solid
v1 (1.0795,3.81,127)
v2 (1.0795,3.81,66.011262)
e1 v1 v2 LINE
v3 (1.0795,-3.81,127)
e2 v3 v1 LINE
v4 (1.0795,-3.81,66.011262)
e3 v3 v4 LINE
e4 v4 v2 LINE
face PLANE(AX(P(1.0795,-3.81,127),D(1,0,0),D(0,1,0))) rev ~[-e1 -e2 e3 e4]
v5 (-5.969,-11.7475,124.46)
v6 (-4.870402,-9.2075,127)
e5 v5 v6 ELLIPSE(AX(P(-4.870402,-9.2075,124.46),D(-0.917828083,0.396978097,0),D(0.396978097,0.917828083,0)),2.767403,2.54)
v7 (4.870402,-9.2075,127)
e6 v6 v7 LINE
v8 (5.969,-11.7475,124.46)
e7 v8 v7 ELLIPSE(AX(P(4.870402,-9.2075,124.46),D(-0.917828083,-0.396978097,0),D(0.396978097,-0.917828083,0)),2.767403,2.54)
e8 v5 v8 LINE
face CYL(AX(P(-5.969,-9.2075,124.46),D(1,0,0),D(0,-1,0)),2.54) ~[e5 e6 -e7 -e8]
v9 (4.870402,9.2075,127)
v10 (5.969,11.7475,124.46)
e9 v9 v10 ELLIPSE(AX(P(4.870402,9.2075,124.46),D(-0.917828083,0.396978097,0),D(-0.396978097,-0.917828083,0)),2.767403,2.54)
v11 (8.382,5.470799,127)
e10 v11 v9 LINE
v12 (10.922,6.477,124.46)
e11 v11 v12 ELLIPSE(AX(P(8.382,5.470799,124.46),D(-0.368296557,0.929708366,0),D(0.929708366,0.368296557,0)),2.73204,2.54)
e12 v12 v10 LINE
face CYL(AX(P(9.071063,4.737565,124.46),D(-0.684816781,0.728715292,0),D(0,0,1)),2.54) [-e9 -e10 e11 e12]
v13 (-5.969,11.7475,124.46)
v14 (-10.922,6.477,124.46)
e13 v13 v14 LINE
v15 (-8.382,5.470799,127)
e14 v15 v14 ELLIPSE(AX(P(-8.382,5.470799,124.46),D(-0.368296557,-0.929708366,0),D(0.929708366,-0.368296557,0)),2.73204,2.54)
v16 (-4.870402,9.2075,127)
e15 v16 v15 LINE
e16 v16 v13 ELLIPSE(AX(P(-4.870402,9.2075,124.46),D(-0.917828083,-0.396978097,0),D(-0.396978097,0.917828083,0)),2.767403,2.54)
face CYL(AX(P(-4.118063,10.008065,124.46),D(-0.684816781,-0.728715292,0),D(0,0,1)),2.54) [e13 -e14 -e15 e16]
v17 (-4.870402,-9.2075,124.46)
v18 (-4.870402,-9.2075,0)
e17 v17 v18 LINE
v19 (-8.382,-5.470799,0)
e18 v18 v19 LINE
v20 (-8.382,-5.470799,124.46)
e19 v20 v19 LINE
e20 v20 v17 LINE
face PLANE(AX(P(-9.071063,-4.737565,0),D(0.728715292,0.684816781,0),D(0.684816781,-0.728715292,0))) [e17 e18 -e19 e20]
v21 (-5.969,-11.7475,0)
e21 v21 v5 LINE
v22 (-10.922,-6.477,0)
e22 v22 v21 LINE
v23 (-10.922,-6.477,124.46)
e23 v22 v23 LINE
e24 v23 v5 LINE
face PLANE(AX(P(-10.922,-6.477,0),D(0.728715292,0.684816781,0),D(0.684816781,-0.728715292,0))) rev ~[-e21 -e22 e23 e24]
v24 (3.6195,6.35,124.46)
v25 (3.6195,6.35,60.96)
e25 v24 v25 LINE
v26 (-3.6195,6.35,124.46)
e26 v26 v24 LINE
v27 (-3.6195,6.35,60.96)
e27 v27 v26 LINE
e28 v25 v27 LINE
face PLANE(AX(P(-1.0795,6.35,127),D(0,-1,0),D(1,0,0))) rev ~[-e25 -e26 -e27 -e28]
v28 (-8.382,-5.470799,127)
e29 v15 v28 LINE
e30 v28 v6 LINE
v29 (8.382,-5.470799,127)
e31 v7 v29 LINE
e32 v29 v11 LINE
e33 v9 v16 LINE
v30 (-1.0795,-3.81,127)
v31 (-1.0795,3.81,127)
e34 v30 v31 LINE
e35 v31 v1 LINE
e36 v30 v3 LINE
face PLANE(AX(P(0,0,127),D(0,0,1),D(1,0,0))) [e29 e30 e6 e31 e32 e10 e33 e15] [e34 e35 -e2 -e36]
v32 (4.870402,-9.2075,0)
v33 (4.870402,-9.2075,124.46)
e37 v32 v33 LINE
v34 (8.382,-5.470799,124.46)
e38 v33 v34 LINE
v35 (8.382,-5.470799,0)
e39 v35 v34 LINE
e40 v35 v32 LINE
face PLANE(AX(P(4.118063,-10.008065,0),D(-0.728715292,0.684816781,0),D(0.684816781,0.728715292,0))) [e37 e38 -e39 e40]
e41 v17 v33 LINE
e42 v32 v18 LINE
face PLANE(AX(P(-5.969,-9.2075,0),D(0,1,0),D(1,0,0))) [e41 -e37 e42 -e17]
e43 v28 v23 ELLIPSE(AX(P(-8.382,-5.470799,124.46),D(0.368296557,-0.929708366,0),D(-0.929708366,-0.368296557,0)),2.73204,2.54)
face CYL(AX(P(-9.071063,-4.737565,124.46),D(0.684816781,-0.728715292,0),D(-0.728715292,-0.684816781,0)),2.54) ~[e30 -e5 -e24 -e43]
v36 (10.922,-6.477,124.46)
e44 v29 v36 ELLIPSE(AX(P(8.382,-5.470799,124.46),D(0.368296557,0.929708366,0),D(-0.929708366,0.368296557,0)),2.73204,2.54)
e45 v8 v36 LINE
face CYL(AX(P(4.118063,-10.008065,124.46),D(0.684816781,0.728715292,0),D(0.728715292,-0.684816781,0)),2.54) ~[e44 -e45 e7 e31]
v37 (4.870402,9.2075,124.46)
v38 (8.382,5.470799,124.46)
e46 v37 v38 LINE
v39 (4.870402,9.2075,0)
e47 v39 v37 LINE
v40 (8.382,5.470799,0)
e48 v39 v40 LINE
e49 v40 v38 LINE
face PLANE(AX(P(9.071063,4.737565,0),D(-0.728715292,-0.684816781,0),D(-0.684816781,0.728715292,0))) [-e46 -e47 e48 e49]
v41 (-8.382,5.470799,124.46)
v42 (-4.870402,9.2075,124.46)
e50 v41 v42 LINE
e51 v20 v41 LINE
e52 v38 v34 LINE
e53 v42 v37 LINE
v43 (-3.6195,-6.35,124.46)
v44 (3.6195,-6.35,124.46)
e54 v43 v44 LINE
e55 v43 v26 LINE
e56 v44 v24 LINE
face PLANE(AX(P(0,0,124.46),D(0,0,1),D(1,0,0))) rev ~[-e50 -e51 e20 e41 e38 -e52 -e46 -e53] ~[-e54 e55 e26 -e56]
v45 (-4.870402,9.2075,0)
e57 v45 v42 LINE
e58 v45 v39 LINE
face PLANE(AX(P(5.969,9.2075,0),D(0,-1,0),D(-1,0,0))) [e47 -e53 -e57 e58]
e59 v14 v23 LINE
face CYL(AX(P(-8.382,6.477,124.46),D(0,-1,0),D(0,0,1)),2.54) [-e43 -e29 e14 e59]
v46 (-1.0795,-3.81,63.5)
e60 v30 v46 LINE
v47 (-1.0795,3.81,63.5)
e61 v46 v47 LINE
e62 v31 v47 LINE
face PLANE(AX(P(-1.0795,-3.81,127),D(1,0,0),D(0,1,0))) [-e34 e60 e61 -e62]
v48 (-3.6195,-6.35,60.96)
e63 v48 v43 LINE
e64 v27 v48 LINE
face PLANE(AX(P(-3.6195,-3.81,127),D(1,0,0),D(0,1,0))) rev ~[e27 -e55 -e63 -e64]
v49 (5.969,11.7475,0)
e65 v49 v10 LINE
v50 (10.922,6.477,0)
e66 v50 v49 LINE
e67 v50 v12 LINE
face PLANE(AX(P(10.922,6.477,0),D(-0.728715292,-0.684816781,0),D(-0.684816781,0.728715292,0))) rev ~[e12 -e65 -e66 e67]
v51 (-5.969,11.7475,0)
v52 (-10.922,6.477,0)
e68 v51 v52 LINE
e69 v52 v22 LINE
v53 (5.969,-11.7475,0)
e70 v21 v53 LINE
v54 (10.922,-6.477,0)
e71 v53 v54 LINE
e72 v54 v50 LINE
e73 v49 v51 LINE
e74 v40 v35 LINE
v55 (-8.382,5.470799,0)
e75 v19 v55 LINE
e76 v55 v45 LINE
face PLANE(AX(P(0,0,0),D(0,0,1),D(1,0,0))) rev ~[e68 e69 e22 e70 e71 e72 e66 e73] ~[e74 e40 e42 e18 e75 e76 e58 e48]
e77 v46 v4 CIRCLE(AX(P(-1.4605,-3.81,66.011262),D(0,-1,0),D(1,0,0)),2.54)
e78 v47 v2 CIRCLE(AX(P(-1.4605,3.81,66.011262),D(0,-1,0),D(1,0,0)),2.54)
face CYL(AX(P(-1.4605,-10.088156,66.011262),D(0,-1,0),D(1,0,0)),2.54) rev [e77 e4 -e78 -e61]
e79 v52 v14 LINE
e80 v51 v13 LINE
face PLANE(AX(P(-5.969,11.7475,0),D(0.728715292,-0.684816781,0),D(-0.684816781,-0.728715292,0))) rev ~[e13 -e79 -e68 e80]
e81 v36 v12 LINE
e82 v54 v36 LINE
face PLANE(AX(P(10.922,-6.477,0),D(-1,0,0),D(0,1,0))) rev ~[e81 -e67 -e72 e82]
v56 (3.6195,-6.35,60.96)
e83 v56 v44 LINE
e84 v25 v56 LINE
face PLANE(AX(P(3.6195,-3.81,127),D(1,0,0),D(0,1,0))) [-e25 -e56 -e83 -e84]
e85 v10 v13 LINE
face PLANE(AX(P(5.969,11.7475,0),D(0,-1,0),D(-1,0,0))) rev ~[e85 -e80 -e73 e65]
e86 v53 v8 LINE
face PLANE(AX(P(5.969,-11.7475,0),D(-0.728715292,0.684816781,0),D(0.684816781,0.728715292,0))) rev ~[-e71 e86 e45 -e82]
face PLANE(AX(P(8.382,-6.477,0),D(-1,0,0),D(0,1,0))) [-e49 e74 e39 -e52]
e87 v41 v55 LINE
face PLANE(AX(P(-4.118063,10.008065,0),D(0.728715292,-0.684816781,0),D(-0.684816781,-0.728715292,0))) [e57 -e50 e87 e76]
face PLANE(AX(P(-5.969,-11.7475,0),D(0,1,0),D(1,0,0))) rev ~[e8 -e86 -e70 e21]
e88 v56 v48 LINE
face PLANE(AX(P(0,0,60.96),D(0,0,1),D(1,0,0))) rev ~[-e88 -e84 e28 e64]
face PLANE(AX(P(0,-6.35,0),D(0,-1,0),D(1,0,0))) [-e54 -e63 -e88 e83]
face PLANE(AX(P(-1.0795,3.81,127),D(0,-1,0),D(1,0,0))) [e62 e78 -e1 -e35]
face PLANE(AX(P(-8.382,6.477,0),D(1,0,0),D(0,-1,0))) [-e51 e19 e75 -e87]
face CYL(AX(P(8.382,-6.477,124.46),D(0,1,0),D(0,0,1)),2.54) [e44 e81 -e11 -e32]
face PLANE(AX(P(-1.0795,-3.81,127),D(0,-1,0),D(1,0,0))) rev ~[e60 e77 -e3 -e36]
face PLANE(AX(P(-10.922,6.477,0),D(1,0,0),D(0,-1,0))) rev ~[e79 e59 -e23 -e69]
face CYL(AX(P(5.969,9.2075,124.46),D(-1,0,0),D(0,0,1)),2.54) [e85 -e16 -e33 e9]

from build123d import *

# Parameters (mm, degrees)
F1_DEPTH    = 127
F2_W        = 2.159
F2_H        = 7.62
F3_DEPTH    = 63.5
F4_T        = -2.54
F5_R        = 2.54
F6_T4_DEPTH = 20.1763121576


# Not quite as in the source:
# - a fillet or chamfer that OpenCascade refuses, or shapes differently, is made with other operations: its cross-section is extruded or revolved along the edge and cut away or added


with BuildPart() as f1:
    # F0 (on Top) → F1 (new body)
    with BuildSketch(Plane.XY):
        Polygon((-5.969, -11.7475), (5.969, -11.7475), (10.922, -6.477), (10.922, 6.477), (5.969, 11.7475), (-5.969, 11.7475), (-10.922, 6.477), (-10.922, -6.477), align=None)
    extrude(amount=F1_DEPTH)

    # F2 (on face) → F3 (cut)
    with BuildSketch(Plane.XY.offset(127)):
        Rectangle(F2_W, F2_H)
    extrude(amount=-F3_DEPTH, mode=Mode.SUBTRACT)

    # F4
    f4_openings = [f1.faces().sort_by_distance(p)[0] for p in [
        (0, 0, 0),
    ]]
    offset(amount=F4_T, openings=f4_openings, kind=Kind.INTERSECTION)

    # F5
    f5_edges = [f1.edges().sort_by_distance(p)[0] for p in [
        (10.922, 0, 127),
        (0, 11.7475, 127),
        (-10.922, 0, 127),
        (0, -11.7475, 127),
        (-8.4455, 9.11225, 127),
        (8.4455, 9.11225, 127),
        (8.4455, -9.11225, 127),
        (-8.4455, -9.11225, 127),
    ]]
    fillet(f5_edges, radius=F5_R)

    # F6: fillet of radius 2.54 on 1 edges, made by hand


with BuildPart() as f6_tool2:
    # F6_s3 → F6_t4 (new body)
    with BuildSketch(Plane.XZ.offset(10.0881560788)):
        with BuildLine():
            ThreePointArc((1.0795, 66.0112624315), (0.4655503628, 64.3553850206), (-1.0795, 63.5))
            Line((-1.0795, 63.5), (1.0795, 63.5))
            Line((1.0795, 63.5), (1.0795, 66.0112624315))
        make_face()
    extrude(amount=-F6_T4_DEPTH)

    split(bisect_by=Plane.XZ.offset(6.35), keep=Keep.BOTTOM)

    split(bisect_by=Plane.XZ.offset(-6.35), keep=Keep.TOP)


with BuildPart() as f1_1:
    add(f1.part)

    # F6_t1: union F6_tool2
    add(f6_tool2.part)


solid = f1_1.part
